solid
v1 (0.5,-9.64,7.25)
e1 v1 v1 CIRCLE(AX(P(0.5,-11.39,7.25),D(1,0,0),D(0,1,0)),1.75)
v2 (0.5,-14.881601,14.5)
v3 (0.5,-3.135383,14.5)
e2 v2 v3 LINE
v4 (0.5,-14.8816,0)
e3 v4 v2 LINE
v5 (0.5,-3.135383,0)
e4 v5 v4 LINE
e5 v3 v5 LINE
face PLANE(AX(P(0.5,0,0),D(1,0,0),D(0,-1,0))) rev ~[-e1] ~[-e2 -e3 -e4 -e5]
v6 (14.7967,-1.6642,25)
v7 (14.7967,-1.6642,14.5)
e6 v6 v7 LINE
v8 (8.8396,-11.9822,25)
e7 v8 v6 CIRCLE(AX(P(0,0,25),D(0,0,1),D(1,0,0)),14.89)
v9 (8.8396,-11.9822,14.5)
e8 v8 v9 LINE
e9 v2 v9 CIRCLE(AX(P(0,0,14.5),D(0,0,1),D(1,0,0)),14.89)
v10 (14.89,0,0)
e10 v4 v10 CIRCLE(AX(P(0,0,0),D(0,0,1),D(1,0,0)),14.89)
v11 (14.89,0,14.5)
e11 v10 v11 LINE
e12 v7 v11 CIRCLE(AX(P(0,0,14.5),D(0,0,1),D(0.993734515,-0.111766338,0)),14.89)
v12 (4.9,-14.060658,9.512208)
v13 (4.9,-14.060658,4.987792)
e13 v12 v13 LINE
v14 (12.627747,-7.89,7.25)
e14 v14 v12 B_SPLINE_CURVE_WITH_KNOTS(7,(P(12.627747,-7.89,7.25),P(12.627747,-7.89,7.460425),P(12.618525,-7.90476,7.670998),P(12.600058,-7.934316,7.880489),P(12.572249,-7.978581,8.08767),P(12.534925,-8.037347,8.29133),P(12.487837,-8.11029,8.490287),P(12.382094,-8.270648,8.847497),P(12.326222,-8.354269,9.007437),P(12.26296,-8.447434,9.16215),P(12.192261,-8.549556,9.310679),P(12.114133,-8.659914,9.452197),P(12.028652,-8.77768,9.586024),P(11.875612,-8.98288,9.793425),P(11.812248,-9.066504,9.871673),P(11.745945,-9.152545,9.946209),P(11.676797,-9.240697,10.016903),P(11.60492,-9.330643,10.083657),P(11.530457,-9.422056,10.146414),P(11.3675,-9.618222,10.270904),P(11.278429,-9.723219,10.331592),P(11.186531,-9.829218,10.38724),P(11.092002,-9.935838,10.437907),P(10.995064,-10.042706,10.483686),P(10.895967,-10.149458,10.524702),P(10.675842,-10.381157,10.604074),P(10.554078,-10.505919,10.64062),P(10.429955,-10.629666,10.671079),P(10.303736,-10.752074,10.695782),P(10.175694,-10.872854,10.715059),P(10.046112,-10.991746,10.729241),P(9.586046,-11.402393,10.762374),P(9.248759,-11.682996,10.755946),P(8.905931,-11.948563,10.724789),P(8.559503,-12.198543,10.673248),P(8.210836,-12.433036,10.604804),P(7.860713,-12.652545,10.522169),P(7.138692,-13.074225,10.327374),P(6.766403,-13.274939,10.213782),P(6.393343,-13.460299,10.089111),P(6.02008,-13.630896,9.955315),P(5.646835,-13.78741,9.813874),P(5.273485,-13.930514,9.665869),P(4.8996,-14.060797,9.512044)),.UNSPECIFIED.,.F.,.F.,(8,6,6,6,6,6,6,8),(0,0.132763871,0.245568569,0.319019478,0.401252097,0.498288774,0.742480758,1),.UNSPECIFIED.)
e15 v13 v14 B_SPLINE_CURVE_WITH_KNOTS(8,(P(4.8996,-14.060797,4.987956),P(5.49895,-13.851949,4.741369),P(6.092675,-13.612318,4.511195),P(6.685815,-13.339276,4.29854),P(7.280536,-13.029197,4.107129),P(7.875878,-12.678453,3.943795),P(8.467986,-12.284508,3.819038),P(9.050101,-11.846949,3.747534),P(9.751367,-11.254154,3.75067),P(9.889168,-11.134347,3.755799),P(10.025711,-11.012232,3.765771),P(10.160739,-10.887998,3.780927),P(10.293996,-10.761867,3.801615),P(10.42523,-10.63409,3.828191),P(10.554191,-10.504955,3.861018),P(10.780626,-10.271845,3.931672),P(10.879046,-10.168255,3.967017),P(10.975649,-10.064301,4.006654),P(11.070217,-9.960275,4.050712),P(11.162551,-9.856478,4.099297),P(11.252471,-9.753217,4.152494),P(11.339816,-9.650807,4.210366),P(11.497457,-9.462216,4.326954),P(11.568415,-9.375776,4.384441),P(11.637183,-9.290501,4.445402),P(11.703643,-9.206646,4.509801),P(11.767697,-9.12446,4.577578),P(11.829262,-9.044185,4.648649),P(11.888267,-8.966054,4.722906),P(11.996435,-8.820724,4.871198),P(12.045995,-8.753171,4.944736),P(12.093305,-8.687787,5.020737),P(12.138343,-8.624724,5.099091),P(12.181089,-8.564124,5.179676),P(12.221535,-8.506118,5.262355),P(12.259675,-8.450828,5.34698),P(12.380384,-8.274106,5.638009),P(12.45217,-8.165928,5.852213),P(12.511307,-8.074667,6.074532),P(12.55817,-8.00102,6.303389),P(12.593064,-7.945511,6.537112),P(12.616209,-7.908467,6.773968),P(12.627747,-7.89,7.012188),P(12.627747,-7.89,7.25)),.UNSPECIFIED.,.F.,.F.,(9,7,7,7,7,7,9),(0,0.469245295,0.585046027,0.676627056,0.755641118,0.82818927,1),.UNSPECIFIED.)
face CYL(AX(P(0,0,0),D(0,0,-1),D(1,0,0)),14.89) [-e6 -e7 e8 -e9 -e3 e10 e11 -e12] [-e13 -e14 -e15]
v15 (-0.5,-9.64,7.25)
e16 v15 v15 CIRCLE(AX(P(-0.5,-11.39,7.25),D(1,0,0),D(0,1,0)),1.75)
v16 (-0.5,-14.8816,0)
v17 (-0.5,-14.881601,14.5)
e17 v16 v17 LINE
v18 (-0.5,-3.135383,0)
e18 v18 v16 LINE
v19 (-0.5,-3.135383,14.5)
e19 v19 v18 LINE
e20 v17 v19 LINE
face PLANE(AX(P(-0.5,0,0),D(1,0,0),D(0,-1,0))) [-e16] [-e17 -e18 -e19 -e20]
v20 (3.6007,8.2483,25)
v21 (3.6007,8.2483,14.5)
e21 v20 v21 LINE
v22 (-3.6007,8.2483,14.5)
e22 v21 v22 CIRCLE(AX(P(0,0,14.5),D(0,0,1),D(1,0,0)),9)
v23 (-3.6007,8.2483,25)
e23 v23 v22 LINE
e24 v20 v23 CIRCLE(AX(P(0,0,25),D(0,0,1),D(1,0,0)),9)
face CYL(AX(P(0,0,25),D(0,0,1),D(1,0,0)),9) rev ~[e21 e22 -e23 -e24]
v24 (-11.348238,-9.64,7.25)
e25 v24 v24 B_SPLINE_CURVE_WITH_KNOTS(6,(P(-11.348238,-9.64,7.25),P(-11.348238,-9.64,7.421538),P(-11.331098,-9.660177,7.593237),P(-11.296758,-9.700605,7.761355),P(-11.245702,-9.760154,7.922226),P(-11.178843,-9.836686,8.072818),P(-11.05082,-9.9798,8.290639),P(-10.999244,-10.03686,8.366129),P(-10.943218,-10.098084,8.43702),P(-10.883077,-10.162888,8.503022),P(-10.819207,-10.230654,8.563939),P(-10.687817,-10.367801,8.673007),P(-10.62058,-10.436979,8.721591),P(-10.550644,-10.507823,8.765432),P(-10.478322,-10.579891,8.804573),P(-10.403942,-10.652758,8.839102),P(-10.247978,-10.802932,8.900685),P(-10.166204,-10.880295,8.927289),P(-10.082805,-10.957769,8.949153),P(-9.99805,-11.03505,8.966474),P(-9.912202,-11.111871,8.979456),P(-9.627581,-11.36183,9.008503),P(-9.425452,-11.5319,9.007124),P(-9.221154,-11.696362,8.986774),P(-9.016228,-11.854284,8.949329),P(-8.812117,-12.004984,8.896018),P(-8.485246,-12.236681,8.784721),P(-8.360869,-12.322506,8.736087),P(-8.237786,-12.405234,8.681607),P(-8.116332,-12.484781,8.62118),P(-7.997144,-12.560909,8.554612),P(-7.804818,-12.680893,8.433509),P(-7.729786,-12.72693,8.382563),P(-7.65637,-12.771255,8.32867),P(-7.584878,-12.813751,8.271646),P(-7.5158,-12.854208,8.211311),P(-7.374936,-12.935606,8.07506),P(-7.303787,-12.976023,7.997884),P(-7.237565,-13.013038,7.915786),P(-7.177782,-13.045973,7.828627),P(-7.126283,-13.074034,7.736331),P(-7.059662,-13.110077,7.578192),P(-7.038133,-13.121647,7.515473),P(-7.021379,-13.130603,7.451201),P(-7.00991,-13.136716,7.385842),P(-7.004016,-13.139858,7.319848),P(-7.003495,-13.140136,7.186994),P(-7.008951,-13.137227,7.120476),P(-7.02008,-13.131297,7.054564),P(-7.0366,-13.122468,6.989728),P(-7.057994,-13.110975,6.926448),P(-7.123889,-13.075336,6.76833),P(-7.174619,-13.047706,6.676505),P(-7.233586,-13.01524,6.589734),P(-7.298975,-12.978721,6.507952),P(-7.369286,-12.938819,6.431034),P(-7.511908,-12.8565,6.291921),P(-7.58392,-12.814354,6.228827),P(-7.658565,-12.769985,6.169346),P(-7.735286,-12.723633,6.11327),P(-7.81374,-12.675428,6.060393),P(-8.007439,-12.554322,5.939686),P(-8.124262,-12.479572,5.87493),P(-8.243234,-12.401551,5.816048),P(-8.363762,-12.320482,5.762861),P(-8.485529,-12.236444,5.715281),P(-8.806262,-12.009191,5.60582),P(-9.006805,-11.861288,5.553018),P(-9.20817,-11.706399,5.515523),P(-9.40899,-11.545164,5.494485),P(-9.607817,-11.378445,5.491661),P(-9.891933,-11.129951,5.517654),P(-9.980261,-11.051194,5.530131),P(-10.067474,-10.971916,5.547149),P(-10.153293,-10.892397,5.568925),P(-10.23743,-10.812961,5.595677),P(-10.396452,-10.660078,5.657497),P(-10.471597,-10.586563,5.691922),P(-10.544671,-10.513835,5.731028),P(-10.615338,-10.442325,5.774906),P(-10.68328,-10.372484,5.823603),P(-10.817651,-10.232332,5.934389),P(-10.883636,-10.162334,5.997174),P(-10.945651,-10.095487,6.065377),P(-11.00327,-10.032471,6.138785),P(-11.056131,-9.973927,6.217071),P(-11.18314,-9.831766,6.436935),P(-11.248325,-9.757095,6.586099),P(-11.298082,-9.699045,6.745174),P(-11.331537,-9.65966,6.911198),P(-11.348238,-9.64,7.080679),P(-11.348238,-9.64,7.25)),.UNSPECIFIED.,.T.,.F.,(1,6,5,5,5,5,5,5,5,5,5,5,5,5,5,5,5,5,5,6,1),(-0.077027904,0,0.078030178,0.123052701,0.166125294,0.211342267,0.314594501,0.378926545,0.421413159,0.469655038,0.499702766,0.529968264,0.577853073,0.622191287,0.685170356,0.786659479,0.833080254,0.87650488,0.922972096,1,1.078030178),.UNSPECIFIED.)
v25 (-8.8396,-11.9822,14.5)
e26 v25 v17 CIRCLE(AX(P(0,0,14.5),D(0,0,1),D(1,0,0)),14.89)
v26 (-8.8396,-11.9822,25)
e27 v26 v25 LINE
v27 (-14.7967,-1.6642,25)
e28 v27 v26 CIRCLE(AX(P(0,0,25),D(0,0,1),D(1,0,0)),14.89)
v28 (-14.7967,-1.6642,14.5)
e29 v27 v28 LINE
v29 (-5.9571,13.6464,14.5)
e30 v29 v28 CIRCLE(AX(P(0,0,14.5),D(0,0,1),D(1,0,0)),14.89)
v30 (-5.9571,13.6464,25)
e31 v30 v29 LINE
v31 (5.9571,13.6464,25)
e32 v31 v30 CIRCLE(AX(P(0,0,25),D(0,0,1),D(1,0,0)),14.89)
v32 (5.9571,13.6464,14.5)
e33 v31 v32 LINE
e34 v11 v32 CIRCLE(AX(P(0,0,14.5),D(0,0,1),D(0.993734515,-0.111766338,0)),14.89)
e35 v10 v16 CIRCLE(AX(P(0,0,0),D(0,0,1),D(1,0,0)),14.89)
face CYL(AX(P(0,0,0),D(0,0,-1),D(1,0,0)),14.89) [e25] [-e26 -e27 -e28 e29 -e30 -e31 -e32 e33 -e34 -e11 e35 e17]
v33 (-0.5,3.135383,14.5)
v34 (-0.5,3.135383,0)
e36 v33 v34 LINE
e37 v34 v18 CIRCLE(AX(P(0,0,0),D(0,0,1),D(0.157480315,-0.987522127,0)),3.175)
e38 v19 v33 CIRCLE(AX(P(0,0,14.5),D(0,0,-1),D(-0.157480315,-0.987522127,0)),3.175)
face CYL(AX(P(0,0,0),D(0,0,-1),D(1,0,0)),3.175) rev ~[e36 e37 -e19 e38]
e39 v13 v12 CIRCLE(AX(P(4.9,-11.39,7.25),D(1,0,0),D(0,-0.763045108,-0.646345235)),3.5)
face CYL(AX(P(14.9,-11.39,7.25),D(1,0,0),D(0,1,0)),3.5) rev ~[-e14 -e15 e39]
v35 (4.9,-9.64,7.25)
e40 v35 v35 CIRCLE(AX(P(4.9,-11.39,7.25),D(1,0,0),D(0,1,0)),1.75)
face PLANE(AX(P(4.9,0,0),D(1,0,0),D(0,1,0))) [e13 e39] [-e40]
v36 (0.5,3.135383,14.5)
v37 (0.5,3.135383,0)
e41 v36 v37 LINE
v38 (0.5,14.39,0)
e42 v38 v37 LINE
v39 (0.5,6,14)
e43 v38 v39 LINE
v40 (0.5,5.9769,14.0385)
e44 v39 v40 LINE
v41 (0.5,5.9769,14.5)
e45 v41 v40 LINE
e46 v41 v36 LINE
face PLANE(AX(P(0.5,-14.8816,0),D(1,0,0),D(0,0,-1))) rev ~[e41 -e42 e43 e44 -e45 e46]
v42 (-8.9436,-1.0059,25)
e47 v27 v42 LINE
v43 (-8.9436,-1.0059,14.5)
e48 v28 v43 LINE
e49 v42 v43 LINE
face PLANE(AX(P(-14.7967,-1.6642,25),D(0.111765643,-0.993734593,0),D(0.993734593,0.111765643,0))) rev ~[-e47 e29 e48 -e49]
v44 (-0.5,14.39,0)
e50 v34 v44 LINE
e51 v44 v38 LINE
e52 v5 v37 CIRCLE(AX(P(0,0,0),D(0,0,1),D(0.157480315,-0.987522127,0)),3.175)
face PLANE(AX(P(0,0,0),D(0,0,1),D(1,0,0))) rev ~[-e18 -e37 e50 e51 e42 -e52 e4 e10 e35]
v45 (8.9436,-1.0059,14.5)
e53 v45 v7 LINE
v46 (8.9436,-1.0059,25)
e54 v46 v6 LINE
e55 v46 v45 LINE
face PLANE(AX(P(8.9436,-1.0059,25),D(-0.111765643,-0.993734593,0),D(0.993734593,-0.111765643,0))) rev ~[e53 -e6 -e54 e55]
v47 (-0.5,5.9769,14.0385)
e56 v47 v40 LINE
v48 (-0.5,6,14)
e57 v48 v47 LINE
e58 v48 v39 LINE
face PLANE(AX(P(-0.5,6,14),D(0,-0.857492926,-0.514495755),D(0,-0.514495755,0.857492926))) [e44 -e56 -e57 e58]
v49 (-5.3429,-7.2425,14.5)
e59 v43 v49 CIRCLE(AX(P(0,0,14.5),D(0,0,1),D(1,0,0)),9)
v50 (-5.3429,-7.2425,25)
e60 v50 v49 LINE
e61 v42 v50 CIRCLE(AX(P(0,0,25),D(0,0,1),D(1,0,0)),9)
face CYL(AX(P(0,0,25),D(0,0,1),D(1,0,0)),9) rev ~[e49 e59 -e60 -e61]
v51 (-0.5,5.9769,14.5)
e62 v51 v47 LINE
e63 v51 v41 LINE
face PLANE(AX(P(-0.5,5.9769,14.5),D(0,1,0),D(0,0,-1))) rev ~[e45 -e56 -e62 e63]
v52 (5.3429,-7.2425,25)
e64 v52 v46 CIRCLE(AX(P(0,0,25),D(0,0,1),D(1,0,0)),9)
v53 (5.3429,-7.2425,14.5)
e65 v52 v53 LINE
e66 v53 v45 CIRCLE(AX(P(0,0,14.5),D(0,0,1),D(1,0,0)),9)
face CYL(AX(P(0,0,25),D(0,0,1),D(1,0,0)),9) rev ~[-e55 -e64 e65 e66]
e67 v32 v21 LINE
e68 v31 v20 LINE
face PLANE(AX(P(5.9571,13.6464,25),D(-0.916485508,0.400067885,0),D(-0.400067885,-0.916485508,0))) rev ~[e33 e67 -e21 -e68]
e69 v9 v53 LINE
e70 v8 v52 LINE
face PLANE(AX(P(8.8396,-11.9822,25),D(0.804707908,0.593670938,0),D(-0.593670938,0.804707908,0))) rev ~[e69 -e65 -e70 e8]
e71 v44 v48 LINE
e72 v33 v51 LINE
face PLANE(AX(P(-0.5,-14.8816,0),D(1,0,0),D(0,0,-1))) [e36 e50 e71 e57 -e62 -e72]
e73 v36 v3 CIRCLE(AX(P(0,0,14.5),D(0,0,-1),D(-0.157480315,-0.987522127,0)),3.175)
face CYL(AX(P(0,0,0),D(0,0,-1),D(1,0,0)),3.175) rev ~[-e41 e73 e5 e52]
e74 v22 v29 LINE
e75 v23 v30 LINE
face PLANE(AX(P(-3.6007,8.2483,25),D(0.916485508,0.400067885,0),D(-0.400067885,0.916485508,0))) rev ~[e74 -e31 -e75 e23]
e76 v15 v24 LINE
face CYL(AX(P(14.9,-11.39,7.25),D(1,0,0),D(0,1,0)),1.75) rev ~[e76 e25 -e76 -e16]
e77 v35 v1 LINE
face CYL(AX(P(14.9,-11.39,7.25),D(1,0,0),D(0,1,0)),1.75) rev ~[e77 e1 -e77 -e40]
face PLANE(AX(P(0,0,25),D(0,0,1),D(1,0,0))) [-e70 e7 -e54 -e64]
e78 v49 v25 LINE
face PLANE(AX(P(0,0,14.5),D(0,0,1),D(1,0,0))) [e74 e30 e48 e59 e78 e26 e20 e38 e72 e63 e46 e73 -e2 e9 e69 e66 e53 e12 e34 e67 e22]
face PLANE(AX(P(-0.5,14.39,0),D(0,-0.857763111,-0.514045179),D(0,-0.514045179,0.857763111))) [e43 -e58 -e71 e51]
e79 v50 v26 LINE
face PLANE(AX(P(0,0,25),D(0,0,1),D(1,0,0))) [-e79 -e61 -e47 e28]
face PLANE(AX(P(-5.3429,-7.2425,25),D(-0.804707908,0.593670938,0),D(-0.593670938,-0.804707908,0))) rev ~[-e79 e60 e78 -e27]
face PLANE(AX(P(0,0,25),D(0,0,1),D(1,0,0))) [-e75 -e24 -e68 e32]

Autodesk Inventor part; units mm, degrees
ref_plane "XZ Plane" through (0, 0, 0) normal (0, 1, 0) x (-1, 0, 0)
ref_plane "XY Plane" through (0, 0, 0) normal (0, 0, 1) x (1, 0, 0)
sketch "Sketch1" plane through (0, 0, 0) normal (0, 0, 1) x (1, 0, 0)
  circle A0 centre (0, 0) radius 14.89
  circle A1 centre (0, 0) radius 6
  circle A2 centre (0, 0) radius 3.175
  dimension "d0" = 29.78
  dimension "d1" = 12
  dimension "d41" = 6.35
extrude "Extrusion1" add sketch "Sketch1" along normal blind 25 contours A0 | A1
sketch "Sketch2" plane through (0, 0, 25) normal (0, 0, 1) x (1, 0, 0)
  circle A0 centre (0, 0) radius 14.89 projected
  circle A1 centre (0, 0) radius 9
  circle A2 centre (0, 0) radius 14.89 projected
  line L0 (-3.6007, 8.2483) -> (-5.9571, 13.6464)
  line L1 (5.9571, 13.6464) -> (3.6007, 8.2483)
  line L2 (-5.3429, -7.2425) -> (-8.8396, -11.9822)
  line L3 (-14.7967, -1.6642) -> (-8.9436, -1.0059)
  line L4 (8.9436, -1.0059) -> (14.7967, -1.6642)
  line L5 (8.8396, -11.9822) -> (5.3429, -7.2425)
  dimension "d14" = 18
  dimension "d24" = 360
extrude "Extrusion2" cut sketch "Sketch2" against normal blind 10.5 contours A0 L4 A1 L1 | L0 A1 L3 A0 | A1 | A0 L2 A1 L5
ref_plane "Work Plane1" through (14.9, 0, 0) normal (1, 0, 0) x (0, 1, 0)
sketch "Sketch3" plane through (14.9, 0, 0) normal (1, 0, 0) x (0, 1, 0)
  line L0 (-1.6642, 14.5) -> (-1.6642, 25) projected
  line L1 (-11.9822, 25) -> (-1.6642, 25) projected
  line L2 (-11.9822, 25) -> (-11.9822, 14.5) projected
  line L3 (-11.9822, 14.5) -> (-11.9822, 14.5) projected
  line L4 (-11.9822, 14.5) -> (-11.9822, 25) projected
  line L5 (-1.6642, 25) -> (-11.9822, 25) projected
  line L6 (-1.6642, 25) -> (-1.6642, 14.5) projected
  line L7 (-1.6642, 14.5) -> (13.6464, 14.5) projected
  line L8 (13.6464, 14.5) -> (13.6464, 25) projected
  line L9 (13.6464, 25) -> (13.6464, 25) projected
  line L10 (13.6464, 25) -> (13.6464, 14.5) projected
  line L11 (13.6464, 14.5) -> (-1.6642, 14.5) projected
  line L12 (14.89, 0) -> (-14.89, 0) projected
  line L13 (14.89, 25) -> (13.6464, 25) projected
  line L14 (14.89, 25) -> (14.89, 0)
  line L15 (14.89, 0) -> (14.89, 25) projected
  line L16 (-14.89, 0) -> (-14.89, 14.5) projected
  line L17 (14.89, 0) -> (-14.89, 0) projected
  line L18 (-14.89, 14.5) -> (-14.89, 0)
  line L19 (-7.89, 0) -> (-14.89, 0)
  line L20 (-14.89, 0) -> (-14.89, 14.5)
  line L21 (-14.89, 7.25) -> (-7.89, 7.25)
  circle A0 centre (-11.39, 7.25) radius 3.5
  circle A1 centre (-11.39, 7.25) radius 1.75
  point P0 (0, 0)
  dimension "d27" = 29.78
  dimension "d30" = 3.5
extrude "Extrusion3" cut sketch "Sketch3" against normal blind 10
extrude "Extrusion4" cut sketch "Sketch3" against normal blind 30 contours A1 L21 | L21 A1
sketch "Sketch4" plane through (0, 0, 0) normal (0, 0, -1) x (-1, 0, 0)
  arc A0 (-8.8396, -11.9822) -> (8.8396, -11.9822) centre (0, 0) ccw projected
  line L0 (0, 0) -> (-0.5, 0)
  line L1 (-0.5, 0) -> (-0.5, -14.8816)
  line L2 (0, 0) -> (0.5, 0)
  line L3 (0.5, 0) -> (0.5, -14.8816)
  line L4 (-0.5, 0) -> (-0.5, 14.8816)
  line L5 (0.5, 0) -> (0.5, 14.8816)
  arc A1 (5.3429, -7.2425) -> (8.9436, -1.0059) centre (0, 0) ccw projected
  circle A2 centre (0, 0) radius 14.89 projected
  point P0 (-8.8396, 11.9822)
  dimension "d33" = 0.5
  dimension "d34" = 0.5
extrude "Extrusion5" cut sketch "Sketch4" against normal blind 15 contours L1 L0 L2 L3 A0
sketch "Sketch5" plane through (-0.5, -14.8816, 0) normal (1, 0, 0) x (0, 0, -1)
  line L0 (0, 0) -> (-14.5, 0) projected
  line L1 (-14.5, 0) -> (-14.5, 2.8994) projected
  line L2 (-14.5, 2.8994) -> (-25, 2.8994) projected
  line L3 (-25, 13.2174) -> (-25, 2.8994) projected
  line L4 (-25, 13.2174) -> (-14.5, 13.2174) projected
  line L5 (-14.5, 13.2174) -> (-14.5, 28.528) projected
  line L6 (-14.5, 28.528) -> (-25, 28.528) projected
  line L7 (-25, 28.528) -> (-25, 28.528) projected
  line L8 (-25, 28.528) -> (-14.5, 28.528) projected
  line L9 (-14.5, 28.528) -> (-14.5, 13.2174) projected
  line L10 (-14.5, 13.2174) -> (-25, 13.2174) projected
  line L11 (-25, 2.8994) -> (-25, 13.2174) projected
  line L12 (-25, 2.8994) -> (-14.5, 2.8994) projected
  line L13 (-14.5, 2.8994) -> (-14.5, 0) projected
  line L14 (-14.5, 0) -> (0, 0) projected
  line L15 (0, 0) -> (0, 0) projected
  line L16 (-4.9878, 0.8209) -> (-9.5122, 0.8209) projected
  line L17 (-14.5, 8.9025) -> (0, 8.9025) projected
  line L18 (0, 8.9025) -> (0, 8.9025) projected
  line L19 (0, 8.9025) -> (-14.5, 8.9025) projected
  line L20 (-14.5, 8.9025) -> (-14.5, 8.9025) projected
  line L21 (-14.5, 20.8816) -> (-14.5, 8.9025) projected
  line L22 (-14.5, 20.8816) -> (0, 20.8816)
  line L23 (0, 29.7716) -> (0, 0) projected
  line L24 (-14.5, 20.8816) -> (-14, 20.8816)
  line L25 (0, 29.7716) -> (0, 29.2716)
  line L26 (0, 29.2716) -> (-14, 20.8816)
  line L27 (-14.5, 20.8585) -> (0, 20.8585)
  line L28 (0, 8.9025) -> (0, 20.8816) projected
  line L29 (-14, 20.8816) -> (-14.0385, 20.8585)
  line L30 (-14.5, 18.0566) -> (0, 18.0566) projected
  line L31 (-14.5, 18.0566) -> (-14.5, 11.7462) projected
  line L32 (-14.5, 18.0145) -> (0, 18.0145)
  line L33 (-14.5, 18.0145) -> (-14, 18.0145)
  line L34 (-14, 18.0145) -> (0, 29.2716)
  point P0 (0, 14.8816)
  point P1 (-13.9476, 18.0566)
  dimension "d37" = 0.5
  dimension "d38" = 0.5
  dimension "d42" = 0.5
extrude "Extrusion6" cut sketch "Sketch5" along normal blind 1 contours L32 L34 L30 L23 | L30 L34 L27 L23 | L32 L5 L30 L34 | L27 L34 L22 L23 | L30 L5 L27 L34 | L22 L34 L23 | L27 L29 L22 L34 | L22 L26 L34
properties part number "PHAN NHOM 6"
